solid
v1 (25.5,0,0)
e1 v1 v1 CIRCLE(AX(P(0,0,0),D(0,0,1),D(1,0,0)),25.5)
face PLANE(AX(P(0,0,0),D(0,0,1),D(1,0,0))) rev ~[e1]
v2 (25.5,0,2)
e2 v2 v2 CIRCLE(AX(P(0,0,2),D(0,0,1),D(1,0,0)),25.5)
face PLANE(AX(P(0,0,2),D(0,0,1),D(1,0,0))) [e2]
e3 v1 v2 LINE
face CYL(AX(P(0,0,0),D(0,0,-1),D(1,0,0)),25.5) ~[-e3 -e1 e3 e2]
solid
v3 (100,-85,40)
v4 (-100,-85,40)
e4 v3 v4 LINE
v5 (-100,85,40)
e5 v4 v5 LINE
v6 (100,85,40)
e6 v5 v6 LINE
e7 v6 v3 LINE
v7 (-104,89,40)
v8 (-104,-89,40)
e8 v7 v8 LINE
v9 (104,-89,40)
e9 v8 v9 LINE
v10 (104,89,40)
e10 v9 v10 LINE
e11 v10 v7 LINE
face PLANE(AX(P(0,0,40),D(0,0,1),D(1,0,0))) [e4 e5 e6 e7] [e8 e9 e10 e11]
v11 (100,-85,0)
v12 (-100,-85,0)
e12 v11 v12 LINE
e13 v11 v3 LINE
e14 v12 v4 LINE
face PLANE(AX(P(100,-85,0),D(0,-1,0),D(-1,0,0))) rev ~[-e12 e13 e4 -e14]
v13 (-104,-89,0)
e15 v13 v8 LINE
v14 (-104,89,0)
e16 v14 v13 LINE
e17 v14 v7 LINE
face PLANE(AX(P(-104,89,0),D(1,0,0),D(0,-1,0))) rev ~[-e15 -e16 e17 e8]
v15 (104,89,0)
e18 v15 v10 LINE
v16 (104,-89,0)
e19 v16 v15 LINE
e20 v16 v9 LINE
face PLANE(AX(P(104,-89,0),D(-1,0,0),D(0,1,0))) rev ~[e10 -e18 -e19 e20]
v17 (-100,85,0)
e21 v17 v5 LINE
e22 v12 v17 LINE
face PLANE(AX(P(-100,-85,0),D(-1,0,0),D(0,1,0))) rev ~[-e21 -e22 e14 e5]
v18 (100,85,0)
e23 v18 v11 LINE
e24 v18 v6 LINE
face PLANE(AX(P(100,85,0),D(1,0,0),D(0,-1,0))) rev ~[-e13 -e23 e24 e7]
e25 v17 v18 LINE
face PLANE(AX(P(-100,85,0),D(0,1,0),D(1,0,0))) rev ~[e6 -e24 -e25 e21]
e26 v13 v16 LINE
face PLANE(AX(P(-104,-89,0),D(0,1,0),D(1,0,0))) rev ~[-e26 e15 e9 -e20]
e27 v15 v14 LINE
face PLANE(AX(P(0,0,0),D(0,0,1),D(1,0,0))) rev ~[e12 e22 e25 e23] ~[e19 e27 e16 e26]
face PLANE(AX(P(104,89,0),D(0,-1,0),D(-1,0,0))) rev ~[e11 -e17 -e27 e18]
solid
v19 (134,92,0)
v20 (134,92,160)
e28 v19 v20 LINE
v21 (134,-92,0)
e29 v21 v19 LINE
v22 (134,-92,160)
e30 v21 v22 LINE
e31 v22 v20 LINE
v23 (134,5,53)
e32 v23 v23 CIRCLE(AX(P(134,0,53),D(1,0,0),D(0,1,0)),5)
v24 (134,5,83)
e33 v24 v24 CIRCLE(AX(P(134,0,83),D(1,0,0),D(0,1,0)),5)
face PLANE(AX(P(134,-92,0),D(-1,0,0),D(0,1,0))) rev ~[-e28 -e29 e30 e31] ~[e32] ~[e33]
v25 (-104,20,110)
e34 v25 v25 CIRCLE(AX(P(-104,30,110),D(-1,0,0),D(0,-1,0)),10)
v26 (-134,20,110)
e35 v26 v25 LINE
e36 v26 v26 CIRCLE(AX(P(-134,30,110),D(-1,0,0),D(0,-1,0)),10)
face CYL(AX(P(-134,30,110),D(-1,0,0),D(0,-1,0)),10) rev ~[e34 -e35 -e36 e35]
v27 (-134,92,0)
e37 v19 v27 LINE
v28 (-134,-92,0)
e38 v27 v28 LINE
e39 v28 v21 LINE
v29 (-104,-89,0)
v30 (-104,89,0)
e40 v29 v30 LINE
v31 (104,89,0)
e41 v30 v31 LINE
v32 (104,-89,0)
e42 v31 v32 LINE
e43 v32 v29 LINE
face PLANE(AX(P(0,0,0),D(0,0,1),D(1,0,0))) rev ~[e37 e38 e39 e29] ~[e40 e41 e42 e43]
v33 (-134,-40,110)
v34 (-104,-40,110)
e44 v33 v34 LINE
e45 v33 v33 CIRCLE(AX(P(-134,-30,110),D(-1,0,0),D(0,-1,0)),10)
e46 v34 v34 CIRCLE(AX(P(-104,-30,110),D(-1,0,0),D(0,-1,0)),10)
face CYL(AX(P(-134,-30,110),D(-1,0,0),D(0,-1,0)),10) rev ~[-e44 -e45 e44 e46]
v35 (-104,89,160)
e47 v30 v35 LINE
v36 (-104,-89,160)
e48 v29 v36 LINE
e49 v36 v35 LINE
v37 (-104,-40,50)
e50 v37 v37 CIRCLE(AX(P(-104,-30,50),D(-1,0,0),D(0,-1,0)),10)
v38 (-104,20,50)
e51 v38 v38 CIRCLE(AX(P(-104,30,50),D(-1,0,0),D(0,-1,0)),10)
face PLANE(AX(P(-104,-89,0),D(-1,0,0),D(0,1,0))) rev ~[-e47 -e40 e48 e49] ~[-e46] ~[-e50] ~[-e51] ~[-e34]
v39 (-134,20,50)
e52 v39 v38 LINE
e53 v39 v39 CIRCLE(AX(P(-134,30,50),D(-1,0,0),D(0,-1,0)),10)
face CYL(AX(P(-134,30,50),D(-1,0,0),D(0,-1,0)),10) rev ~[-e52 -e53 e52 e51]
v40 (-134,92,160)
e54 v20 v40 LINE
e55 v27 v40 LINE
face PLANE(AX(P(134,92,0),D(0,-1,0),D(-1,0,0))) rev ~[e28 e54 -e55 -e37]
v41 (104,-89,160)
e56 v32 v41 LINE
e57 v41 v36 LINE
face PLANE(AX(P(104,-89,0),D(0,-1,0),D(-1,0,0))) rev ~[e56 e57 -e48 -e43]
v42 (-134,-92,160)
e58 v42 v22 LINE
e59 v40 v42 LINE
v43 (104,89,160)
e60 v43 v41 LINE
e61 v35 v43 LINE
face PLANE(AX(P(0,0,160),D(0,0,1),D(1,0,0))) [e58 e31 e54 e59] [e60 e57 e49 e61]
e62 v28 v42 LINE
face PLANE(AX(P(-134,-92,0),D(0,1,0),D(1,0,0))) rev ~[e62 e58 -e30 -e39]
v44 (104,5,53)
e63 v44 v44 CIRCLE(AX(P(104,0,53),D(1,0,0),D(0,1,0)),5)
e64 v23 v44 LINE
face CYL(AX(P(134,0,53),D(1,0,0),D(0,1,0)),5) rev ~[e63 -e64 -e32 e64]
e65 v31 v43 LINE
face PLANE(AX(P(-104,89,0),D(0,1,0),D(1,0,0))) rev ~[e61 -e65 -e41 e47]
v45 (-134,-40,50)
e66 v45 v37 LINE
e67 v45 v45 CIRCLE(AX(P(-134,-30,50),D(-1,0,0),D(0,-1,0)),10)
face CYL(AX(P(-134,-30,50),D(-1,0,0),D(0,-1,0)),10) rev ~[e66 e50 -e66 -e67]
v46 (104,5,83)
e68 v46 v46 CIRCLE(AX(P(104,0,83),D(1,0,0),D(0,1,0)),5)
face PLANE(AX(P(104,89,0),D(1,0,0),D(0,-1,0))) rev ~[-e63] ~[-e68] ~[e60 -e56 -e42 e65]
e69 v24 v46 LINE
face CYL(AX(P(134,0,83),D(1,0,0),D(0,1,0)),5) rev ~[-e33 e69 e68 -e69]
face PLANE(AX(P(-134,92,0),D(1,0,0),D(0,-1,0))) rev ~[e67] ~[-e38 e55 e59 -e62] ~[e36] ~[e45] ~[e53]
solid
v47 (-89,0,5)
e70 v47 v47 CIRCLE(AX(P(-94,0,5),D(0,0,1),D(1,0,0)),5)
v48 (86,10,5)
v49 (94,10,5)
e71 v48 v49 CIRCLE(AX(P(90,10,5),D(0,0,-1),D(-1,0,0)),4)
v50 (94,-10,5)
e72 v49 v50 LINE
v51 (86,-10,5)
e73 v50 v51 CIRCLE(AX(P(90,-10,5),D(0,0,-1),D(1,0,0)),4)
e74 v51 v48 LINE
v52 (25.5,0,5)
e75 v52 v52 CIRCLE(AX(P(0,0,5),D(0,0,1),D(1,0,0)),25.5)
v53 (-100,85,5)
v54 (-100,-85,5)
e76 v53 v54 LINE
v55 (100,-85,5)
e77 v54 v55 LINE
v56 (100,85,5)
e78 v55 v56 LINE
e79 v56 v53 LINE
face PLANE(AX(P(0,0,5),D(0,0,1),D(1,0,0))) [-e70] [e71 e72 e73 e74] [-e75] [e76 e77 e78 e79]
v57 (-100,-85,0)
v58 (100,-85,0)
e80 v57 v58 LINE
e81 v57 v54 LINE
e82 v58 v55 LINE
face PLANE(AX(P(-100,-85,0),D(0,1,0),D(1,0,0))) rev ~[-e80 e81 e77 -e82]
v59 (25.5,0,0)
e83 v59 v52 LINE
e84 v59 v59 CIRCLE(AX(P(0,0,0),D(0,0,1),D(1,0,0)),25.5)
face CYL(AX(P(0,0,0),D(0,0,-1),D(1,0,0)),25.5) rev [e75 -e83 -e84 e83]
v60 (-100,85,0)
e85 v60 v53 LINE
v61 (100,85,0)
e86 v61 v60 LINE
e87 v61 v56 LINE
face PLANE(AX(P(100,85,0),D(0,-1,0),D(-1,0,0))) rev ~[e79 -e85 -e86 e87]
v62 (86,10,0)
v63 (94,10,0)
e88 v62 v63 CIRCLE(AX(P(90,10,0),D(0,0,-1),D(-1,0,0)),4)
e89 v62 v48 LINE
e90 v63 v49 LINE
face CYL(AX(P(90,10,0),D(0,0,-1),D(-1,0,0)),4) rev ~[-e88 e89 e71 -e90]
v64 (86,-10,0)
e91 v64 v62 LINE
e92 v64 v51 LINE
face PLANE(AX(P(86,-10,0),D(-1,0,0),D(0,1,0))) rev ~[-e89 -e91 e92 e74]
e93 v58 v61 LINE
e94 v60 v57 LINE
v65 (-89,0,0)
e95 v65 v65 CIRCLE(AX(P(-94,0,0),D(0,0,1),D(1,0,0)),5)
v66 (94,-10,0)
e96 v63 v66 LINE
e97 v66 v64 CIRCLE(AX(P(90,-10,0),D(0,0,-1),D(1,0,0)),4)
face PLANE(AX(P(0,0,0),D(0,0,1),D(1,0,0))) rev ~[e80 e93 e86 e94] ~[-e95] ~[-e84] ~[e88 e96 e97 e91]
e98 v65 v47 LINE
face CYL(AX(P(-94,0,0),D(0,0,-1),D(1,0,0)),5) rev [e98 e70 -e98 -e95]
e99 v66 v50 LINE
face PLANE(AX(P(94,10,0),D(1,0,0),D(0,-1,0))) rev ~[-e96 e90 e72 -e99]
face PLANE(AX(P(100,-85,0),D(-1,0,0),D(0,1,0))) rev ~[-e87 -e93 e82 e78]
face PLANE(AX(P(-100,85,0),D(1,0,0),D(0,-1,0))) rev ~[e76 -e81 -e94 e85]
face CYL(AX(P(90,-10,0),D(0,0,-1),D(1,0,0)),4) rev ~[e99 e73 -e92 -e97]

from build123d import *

# Parameters (mm, degrees)
F0_R      = 25.5
F1_DEPTH  = 2
F0_R_2    = 5
F2_DEPTH  = 5
F3_DEPTH  = 160
F4_DEPTH  = 40
F5_R      = 5
F6_DEPTH  = 30.3
F7_DEPTH  = 30
F8_DEPTH  = 10
F9_R      = 10
F10_DEPTH = 30


# Not quite as in the source:
# - a feature names something its author has since deleted; it is built from what else it names


with BuildPart() as f1:
    # F0 (on Top) → F1 (new body)
    with BuildSketch(Plane.XY):
        Circle(F0_R)
    extrude(amount=F1_DEPTH)

    # F0 (on Top) → F8 (cut)
    with BuildSketch(Plane.XY):
        with BuildLine():
            Line((94, -10), (94, 0))
            Line((94, 0), (94, 10))
            ThreePointArc((94, 10), (90, 14), (86, 10))
            Line((86, 10), (86, -10))
            ThreePointArc((86, -10), (90, -14), (94, -10))
        make_face()
    extrude(amount=F8_DEPTH, mode=Mode.SUBTRACT)


with BuildPart() as f2:
    # F0 (on Top) → F2 (new body)
    with BuildSketch(Plane.XY):
        Polygon((100, -85), (100, 0), (100, 85), (-100, 85), (-100, -85), align=None)
        with Locations((-94, 0)):
            Circle(F0_R_2, mode=Mode.SUBTRACT)
        Circle(F0_R, mode=Mode.SUBTRACT)
        with BuildLine():
            Line((94, 10), (94, 0))
            Line((94, 0), (94, -10))
            ThreePointArc((94, -10), (90, -14), (86, -10))
            Line((86, -10), (86, 10))
            ThreePointArc((86, 10), (90, 14), (94, 10))
        make_face(mode=Mode.SUBTRACT)
    extrude(amount=F2_DEPTH)


with BuildPart() as f3:
    # F0 (on Top) → F3 (new body)
    with BuildSketch(Plane.XY):
        Polygon((-134, -92), (134, -92), (134, 0), (134, 92), (-134, 92), align=None)
        Polygon((104, 89), (104, 0), (104, -89), (-104, -89), (-104, 89), align=None, mode=Mode.SUBTRACT)
    extrude(amount=F3_DEPTH)

    # F5 (on face) → F6 (cut)
    with BuildSketch(Plane.YZ.offset(134)):
        with Locations((0, 83)):
            Circle(F5_R)
    extrude(amount=-F6_DEPTH, mode=Mode.SUBTRACT)

    # F5 (on face) → F7 (cut)
    with BuildSketch(Plane.YZ.offset(134)):
        with Locations((0, 53)):
            Circle(F5_R)
    extrude(amount=-F7_DEPTH, mode=Mode.SUBTRACT)

    # F9 (on face) → F10 (cut, through all)
    with BuildSketch(Plane(origin=(-134, 0, 0), x_dir=(0, -1, 0), z_dir=(-1, 0, 0))):
        with Locations((-30, 110)):
            Circle(F9_R)
        with Locations((30, 110)):
            Circle(F9_R)
        with Locations((-30, 50)):
            Circle(F9_R)
        with Locations((30, 50)):
            Circle(F9_R)
    extrude(amount=-F10_DEPTH, mode=Mode.SUBTRACT)


with BuildPart() as f4:
    # F0 (on Top) → F4 (new body)
    with BuildSketch(Plane.XY):
        Polygon((104, -89), (104, 0), (104, 89), (-104, 89), (-104, -89), align=None)
        Polygon((100, 85), (100, 0), (100, -85), (-100, -85), (-100, 85), align=None, mode=Mode.SUBTRACT)
    extrude(amount=F4_DEPTH)


solid = Compound([f1.part, f2.part, f3.part, f4.part])
